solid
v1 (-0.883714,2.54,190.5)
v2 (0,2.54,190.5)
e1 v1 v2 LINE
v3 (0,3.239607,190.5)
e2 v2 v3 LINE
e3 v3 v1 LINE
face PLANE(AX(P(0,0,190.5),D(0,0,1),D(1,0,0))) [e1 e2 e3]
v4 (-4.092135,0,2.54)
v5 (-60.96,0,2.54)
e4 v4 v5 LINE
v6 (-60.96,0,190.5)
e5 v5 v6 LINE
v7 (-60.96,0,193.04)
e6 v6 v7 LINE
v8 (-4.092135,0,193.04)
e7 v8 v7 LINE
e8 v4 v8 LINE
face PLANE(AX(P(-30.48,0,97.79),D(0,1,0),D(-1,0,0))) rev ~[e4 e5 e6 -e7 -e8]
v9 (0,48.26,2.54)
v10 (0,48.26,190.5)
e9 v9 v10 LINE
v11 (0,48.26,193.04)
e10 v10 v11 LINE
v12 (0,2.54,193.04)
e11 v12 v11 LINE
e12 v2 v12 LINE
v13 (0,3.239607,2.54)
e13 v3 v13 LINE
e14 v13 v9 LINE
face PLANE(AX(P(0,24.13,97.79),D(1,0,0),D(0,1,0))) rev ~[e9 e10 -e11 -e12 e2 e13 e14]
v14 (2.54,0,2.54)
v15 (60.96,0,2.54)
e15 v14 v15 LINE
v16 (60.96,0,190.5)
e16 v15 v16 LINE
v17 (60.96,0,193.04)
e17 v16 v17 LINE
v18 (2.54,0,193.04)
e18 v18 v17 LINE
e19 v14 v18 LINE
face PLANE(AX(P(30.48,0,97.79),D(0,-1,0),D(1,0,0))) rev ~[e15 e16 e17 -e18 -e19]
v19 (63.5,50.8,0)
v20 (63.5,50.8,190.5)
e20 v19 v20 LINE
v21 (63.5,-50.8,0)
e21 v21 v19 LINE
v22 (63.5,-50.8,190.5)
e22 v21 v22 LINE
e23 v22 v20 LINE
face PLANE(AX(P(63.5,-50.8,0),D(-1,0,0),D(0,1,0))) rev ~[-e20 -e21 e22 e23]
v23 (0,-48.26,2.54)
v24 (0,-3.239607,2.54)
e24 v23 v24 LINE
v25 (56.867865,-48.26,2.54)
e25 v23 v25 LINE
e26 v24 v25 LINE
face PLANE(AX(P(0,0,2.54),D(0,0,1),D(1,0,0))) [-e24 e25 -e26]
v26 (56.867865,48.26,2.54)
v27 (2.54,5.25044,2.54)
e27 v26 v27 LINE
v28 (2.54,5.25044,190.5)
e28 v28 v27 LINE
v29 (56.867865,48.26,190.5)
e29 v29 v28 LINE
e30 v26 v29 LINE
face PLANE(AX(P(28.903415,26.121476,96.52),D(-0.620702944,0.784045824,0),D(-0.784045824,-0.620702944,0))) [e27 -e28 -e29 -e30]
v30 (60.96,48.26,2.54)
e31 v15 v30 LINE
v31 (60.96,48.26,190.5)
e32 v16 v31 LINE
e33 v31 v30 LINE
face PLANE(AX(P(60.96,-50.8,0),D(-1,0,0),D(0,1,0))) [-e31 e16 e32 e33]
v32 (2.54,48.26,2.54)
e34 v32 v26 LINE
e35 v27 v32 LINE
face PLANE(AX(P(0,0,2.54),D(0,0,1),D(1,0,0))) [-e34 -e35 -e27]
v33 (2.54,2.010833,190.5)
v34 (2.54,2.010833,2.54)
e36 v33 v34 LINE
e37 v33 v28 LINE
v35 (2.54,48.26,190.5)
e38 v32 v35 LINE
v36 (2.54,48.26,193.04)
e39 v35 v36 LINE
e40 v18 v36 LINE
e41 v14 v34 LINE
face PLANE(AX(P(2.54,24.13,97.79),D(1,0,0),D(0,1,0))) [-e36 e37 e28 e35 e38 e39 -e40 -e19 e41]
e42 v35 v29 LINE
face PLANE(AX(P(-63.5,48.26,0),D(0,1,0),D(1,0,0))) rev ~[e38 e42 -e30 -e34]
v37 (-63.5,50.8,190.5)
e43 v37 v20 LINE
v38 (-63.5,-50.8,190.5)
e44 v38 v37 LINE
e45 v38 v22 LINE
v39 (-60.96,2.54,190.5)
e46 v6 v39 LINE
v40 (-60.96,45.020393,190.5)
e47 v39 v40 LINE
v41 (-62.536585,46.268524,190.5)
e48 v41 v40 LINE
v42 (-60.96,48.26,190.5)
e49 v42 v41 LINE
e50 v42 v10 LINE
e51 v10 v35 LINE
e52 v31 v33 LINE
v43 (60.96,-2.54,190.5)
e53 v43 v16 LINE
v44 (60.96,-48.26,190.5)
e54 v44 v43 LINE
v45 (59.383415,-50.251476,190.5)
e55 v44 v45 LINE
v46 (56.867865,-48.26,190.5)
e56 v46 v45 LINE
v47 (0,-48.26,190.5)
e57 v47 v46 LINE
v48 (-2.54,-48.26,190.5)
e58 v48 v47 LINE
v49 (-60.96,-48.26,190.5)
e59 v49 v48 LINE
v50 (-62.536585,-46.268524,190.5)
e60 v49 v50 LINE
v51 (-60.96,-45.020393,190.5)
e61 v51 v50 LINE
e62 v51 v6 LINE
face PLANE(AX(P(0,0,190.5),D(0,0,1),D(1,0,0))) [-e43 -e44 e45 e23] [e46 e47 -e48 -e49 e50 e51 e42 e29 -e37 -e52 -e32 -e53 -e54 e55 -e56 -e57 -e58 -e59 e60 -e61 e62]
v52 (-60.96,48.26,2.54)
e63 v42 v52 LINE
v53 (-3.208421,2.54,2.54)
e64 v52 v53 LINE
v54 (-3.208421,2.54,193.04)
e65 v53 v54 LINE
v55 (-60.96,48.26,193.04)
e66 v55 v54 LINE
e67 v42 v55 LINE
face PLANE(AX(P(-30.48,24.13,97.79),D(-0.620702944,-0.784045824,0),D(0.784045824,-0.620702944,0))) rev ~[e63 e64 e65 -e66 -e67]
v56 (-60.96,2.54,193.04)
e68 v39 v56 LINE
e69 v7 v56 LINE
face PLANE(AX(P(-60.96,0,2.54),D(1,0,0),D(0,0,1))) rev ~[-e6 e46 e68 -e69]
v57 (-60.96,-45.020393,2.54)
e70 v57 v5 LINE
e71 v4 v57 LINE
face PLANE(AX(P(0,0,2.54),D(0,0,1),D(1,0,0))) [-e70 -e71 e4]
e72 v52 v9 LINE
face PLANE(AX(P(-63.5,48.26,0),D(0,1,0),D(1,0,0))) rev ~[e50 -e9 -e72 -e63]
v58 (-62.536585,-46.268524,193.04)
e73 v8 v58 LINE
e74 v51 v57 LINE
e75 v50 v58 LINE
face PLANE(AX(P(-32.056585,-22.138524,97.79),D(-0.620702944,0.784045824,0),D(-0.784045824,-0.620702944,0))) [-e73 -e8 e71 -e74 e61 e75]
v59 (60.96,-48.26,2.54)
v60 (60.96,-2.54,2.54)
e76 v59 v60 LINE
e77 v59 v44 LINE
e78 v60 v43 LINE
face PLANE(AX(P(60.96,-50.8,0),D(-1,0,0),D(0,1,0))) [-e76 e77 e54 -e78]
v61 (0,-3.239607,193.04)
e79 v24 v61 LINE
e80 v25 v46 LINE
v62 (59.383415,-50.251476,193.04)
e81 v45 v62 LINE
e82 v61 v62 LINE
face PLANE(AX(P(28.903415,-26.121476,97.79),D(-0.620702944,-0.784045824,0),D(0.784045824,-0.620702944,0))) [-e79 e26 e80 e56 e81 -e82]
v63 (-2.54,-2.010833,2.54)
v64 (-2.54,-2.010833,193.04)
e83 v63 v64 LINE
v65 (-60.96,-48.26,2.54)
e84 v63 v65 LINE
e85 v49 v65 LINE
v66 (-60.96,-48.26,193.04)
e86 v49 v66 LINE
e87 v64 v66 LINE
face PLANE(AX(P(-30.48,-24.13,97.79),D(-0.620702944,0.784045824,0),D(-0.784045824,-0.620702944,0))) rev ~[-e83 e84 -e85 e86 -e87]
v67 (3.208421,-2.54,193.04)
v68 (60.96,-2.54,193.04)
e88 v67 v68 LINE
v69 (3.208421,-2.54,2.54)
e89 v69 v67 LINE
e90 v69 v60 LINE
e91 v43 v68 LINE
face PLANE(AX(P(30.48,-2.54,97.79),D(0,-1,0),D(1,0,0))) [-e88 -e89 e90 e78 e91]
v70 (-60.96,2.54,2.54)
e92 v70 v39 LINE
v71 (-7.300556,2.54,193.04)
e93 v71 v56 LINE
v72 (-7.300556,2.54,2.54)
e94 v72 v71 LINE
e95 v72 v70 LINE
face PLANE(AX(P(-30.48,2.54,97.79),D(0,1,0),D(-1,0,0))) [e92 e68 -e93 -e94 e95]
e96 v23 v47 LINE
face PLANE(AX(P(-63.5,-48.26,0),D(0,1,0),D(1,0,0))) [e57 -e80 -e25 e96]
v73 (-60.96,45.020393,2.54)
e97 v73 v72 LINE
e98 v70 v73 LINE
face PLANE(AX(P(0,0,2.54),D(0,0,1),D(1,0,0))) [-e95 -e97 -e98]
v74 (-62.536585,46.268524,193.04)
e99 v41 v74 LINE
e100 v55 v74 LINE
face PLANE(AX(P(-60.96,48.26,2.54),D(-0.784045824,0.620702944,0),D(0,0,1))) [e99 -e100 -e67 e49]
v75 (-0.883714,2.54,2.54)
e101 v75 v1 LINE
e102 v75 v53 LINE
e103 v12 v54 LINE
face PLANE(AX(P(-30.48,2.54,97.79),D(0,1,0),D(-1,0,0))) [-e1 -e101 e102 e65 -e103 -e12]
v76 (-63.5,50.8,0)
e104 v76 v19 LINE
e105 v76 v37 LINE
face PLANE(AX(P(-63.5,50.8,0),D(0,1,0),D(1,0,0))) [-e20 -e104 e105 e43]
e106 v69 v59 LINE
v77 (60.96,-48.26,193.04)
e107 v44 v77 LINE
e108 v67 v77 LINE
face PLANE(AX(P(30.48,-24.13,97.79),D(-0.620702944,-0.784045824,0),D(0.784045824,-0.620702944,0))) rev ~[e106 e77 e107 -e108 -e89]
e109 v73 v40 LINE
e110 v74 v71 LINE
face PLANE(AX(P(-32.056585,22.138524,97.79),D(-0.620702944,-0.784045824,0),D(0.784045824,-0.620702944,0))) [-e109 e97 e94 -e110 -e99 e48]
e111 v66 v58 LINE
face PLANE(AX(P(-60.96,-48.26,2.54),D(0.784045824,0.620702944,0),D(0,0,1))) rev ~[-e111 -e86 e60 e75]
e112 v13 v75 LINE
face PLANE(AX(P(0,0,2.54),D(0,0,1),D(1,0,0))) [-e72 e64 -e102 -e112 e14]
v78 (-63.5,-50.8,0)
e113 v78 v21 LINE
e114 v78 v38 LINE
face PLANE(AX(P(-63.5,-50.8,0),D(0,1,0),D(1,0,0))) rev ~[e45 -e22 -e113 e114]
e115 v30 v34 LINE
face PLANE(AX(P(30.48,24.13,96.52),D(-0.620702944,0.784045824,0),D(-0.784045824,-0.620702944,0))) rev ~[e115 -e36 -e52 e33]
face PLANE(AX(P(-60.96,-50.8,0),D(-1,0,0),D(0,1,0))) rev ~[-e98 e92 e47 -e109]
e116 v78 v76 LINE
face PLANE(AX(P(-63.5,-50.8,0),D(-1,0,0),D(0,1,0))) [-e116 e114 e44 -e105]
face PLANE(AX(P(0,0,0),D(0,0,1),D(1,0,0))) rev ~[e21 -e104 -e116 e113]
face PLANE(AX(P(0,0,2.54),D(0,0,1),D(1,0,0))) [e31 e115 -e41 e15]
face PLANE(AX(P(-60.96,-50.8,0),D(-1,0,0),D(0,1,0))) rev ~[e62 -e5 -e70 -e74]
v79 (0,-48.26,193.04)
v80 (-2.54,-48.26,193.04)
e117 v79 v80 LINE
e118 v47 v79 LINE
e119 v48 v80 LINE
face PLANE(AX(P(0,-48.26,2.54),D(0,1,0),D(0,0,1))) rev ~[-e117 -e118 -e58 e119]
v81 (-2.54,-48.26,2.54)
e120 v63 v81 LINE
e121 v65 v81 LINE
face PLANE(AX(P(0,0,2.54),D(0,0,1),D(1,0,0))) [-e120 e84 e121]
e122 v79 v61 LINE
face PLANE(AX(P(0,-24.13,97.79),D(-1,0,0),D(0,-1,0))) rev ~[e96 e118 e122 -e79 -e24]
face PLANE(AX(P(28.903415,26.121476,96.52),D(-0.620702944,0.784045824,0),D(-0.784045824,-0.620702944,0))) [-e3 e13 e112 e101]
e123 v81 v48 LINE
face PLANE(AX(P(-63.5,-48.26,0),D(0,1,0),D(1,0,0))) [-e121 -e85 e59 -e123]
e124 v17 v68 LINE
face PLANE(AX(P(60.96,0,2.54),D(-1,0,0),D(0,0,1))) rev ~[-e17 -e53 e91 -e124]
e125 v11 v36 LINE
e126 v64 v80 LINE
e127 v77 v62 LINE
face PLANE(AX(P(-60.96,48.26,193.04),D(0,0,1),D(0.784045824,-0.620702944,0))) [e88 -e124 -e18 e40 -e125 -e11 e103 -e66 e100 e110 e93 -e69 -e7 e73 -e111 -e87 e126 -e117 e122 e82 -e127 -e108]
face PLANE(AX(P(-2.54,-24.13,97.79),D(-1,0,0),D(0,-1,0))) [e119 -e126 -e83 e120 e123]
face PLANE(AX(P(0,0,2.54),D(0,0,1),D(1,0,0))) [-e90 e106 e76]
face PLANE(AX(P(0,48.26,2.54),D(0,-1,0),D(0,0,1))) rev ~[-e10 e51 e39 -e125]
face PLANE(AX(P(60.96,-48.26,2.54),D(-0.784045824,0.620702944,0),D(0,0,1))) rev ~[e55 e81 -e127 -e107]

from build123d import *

# Parameters (mm, degrees)
F0_W      = 127
F0_H      = 101.6
F1_DEPTH  = 190.5
F2_T      = -2.54
F10_E18_W = 60.96
F10_E18_H = 190.5
F19_DEPTH = 2.54
F12_E19_W = 77.7505575543
F12_E19_H = 190.5
F20_DEPTH = 2.54
F14_E20_W = 48.26
F14_E20_H = 190.5
F21_DEPTH = 2.54
F16_E21_W = 77.7505575543
F16_E21_H = 190.5
F22_DEPTH = 2.54
F18_E22_W = 60.96
F18_E22_H = 190.5
F23_DEPTH = 2.54
F4_E9_W   = 77.7505575543
F4_E9_H   = 187.96
F24_DEPTH = 2.54
F6_E16_W  = 48.26
F6_E16_H  = 190.5
F25_DEPTH = 2.54
F8_E17_W  = 77.7505575543
F8_E17_H  = 190.5
F26_DEPTH = 2.54


with BuildPart() as f1:
    # F0 (on Top) → F1 (new body)
    with BuildSketch(Plane.XY):
        Rectangle(F0_W, F0_H)
    extrude(amount=F1_DEPTH)

    # F2
    f2_openings = [f1.faces().sort_by_distance(p)[0] for p in [
        (0, 0, 190.5),
    ]]
    offset(amount=F2_T, openings=f2_openings)

    # F10_E18 (on explicit) → F19 (join)
    with BuildSketch(Plane(origin=(0, 0, 2.54), x_dir=(-1, 0, 0), z_dir=(0, 1, 0))):
        with Locations((30.48, 95.25)):
            Rectangle(F10_E18_W, F10_E18_H)
    extrude(amount=F19_DEPTH)

    # F12_E19 (on explicit) → F20 (join)
    with BuildSketch(Plane(origin=(0, 0, 2.54), x_dir=(-0.7840458245, -0.6207029444, 0), z_dir=(-0.6207029444, 0.7840458245, 0))):
        with Locations((38.8752787771, 95.25)):
            Rectangle(F12_E19_W, F12_E19_H)
    extrude(amount=F20_DEPTH)

    # F14_E20 (on explicit) → F21 (join)
    with BuildSketch(Plane(origin=(0, 0, 2.54), x_dir=(0, -1, 0), z_dir=(-1, 0, 0))):
        with Locations((24.13, 95.25)):
            Rectangle(F14_E20_W, F14_E20_H)
    extrude(amount=F21_DEPTH)

    # F16_E21 (on explicit) → F22 (join)
    with BuildSketch(Plane(origin=(0, 0, 2.54), x_dir=(0.7840458245, -0.6207029444, 0), z_dir=(-0.6207029444, -0.7840458245, 0))):
        with Locations((38.8752787771, 95.25)):
            Rectangle(F16_E21_W, F16_E21_H)
    extrude(amount=F22_DEPTH)

    # F18_E22 (on explicit) → F23 (join)
    with BuildSketch(Plane(origin=(0, 0, 2.54), x_dir=(1, 0, 0), z_dir=(0, -1, 0))):
        with Locations((30.48, 95.25)):
            Rectangle(F18_E22_W, F18_E22_H)
    extrude(amount=F23_DEPTH)

    # F4_E9 (on explicit) → F24 (join)
    with BuildSketch(Plane(origin=(60.96, 48.26, 2.54), x_dir=(-0.7840458245, -0.6207029444, 0), z_dir=(-0.6207029444, 0.7840458245, 0))):
        with Locations((38.8752787771, 93.98)):
            Rectangle(F4_E9_W, F4_E9_H)
    extrude(amount=F24_DEPTH)

    # F6_E16 (on explicit) → F25 (join)
    with BuildSketch(Plane(origin=(0, 0, 2.54), x_dir=(0, 1, 0), z_dir=(1, 0, 0))):
        with Locations((24.13, 95.25)):
            Rectangle(F6_E16_W, F6_E16_H)
    extrude(amount=F25_DEPTH)

    # F8_E17 (on explicit) → F26 (join)
    with BuildSketch(Plane(origin=(-60.96, 48.26, 2.54), x_dir=(0.7840458245, -0.6207029444, 0), z_dir=(-0.6207029444, -0.7840458245, 0))):
        with Locations((38.8752787771, 95.25)):
            Rectangle(F8_E17_W, F8_E17_H)
    extrude(amount=F26_DEPTH)


solid = f1.part
